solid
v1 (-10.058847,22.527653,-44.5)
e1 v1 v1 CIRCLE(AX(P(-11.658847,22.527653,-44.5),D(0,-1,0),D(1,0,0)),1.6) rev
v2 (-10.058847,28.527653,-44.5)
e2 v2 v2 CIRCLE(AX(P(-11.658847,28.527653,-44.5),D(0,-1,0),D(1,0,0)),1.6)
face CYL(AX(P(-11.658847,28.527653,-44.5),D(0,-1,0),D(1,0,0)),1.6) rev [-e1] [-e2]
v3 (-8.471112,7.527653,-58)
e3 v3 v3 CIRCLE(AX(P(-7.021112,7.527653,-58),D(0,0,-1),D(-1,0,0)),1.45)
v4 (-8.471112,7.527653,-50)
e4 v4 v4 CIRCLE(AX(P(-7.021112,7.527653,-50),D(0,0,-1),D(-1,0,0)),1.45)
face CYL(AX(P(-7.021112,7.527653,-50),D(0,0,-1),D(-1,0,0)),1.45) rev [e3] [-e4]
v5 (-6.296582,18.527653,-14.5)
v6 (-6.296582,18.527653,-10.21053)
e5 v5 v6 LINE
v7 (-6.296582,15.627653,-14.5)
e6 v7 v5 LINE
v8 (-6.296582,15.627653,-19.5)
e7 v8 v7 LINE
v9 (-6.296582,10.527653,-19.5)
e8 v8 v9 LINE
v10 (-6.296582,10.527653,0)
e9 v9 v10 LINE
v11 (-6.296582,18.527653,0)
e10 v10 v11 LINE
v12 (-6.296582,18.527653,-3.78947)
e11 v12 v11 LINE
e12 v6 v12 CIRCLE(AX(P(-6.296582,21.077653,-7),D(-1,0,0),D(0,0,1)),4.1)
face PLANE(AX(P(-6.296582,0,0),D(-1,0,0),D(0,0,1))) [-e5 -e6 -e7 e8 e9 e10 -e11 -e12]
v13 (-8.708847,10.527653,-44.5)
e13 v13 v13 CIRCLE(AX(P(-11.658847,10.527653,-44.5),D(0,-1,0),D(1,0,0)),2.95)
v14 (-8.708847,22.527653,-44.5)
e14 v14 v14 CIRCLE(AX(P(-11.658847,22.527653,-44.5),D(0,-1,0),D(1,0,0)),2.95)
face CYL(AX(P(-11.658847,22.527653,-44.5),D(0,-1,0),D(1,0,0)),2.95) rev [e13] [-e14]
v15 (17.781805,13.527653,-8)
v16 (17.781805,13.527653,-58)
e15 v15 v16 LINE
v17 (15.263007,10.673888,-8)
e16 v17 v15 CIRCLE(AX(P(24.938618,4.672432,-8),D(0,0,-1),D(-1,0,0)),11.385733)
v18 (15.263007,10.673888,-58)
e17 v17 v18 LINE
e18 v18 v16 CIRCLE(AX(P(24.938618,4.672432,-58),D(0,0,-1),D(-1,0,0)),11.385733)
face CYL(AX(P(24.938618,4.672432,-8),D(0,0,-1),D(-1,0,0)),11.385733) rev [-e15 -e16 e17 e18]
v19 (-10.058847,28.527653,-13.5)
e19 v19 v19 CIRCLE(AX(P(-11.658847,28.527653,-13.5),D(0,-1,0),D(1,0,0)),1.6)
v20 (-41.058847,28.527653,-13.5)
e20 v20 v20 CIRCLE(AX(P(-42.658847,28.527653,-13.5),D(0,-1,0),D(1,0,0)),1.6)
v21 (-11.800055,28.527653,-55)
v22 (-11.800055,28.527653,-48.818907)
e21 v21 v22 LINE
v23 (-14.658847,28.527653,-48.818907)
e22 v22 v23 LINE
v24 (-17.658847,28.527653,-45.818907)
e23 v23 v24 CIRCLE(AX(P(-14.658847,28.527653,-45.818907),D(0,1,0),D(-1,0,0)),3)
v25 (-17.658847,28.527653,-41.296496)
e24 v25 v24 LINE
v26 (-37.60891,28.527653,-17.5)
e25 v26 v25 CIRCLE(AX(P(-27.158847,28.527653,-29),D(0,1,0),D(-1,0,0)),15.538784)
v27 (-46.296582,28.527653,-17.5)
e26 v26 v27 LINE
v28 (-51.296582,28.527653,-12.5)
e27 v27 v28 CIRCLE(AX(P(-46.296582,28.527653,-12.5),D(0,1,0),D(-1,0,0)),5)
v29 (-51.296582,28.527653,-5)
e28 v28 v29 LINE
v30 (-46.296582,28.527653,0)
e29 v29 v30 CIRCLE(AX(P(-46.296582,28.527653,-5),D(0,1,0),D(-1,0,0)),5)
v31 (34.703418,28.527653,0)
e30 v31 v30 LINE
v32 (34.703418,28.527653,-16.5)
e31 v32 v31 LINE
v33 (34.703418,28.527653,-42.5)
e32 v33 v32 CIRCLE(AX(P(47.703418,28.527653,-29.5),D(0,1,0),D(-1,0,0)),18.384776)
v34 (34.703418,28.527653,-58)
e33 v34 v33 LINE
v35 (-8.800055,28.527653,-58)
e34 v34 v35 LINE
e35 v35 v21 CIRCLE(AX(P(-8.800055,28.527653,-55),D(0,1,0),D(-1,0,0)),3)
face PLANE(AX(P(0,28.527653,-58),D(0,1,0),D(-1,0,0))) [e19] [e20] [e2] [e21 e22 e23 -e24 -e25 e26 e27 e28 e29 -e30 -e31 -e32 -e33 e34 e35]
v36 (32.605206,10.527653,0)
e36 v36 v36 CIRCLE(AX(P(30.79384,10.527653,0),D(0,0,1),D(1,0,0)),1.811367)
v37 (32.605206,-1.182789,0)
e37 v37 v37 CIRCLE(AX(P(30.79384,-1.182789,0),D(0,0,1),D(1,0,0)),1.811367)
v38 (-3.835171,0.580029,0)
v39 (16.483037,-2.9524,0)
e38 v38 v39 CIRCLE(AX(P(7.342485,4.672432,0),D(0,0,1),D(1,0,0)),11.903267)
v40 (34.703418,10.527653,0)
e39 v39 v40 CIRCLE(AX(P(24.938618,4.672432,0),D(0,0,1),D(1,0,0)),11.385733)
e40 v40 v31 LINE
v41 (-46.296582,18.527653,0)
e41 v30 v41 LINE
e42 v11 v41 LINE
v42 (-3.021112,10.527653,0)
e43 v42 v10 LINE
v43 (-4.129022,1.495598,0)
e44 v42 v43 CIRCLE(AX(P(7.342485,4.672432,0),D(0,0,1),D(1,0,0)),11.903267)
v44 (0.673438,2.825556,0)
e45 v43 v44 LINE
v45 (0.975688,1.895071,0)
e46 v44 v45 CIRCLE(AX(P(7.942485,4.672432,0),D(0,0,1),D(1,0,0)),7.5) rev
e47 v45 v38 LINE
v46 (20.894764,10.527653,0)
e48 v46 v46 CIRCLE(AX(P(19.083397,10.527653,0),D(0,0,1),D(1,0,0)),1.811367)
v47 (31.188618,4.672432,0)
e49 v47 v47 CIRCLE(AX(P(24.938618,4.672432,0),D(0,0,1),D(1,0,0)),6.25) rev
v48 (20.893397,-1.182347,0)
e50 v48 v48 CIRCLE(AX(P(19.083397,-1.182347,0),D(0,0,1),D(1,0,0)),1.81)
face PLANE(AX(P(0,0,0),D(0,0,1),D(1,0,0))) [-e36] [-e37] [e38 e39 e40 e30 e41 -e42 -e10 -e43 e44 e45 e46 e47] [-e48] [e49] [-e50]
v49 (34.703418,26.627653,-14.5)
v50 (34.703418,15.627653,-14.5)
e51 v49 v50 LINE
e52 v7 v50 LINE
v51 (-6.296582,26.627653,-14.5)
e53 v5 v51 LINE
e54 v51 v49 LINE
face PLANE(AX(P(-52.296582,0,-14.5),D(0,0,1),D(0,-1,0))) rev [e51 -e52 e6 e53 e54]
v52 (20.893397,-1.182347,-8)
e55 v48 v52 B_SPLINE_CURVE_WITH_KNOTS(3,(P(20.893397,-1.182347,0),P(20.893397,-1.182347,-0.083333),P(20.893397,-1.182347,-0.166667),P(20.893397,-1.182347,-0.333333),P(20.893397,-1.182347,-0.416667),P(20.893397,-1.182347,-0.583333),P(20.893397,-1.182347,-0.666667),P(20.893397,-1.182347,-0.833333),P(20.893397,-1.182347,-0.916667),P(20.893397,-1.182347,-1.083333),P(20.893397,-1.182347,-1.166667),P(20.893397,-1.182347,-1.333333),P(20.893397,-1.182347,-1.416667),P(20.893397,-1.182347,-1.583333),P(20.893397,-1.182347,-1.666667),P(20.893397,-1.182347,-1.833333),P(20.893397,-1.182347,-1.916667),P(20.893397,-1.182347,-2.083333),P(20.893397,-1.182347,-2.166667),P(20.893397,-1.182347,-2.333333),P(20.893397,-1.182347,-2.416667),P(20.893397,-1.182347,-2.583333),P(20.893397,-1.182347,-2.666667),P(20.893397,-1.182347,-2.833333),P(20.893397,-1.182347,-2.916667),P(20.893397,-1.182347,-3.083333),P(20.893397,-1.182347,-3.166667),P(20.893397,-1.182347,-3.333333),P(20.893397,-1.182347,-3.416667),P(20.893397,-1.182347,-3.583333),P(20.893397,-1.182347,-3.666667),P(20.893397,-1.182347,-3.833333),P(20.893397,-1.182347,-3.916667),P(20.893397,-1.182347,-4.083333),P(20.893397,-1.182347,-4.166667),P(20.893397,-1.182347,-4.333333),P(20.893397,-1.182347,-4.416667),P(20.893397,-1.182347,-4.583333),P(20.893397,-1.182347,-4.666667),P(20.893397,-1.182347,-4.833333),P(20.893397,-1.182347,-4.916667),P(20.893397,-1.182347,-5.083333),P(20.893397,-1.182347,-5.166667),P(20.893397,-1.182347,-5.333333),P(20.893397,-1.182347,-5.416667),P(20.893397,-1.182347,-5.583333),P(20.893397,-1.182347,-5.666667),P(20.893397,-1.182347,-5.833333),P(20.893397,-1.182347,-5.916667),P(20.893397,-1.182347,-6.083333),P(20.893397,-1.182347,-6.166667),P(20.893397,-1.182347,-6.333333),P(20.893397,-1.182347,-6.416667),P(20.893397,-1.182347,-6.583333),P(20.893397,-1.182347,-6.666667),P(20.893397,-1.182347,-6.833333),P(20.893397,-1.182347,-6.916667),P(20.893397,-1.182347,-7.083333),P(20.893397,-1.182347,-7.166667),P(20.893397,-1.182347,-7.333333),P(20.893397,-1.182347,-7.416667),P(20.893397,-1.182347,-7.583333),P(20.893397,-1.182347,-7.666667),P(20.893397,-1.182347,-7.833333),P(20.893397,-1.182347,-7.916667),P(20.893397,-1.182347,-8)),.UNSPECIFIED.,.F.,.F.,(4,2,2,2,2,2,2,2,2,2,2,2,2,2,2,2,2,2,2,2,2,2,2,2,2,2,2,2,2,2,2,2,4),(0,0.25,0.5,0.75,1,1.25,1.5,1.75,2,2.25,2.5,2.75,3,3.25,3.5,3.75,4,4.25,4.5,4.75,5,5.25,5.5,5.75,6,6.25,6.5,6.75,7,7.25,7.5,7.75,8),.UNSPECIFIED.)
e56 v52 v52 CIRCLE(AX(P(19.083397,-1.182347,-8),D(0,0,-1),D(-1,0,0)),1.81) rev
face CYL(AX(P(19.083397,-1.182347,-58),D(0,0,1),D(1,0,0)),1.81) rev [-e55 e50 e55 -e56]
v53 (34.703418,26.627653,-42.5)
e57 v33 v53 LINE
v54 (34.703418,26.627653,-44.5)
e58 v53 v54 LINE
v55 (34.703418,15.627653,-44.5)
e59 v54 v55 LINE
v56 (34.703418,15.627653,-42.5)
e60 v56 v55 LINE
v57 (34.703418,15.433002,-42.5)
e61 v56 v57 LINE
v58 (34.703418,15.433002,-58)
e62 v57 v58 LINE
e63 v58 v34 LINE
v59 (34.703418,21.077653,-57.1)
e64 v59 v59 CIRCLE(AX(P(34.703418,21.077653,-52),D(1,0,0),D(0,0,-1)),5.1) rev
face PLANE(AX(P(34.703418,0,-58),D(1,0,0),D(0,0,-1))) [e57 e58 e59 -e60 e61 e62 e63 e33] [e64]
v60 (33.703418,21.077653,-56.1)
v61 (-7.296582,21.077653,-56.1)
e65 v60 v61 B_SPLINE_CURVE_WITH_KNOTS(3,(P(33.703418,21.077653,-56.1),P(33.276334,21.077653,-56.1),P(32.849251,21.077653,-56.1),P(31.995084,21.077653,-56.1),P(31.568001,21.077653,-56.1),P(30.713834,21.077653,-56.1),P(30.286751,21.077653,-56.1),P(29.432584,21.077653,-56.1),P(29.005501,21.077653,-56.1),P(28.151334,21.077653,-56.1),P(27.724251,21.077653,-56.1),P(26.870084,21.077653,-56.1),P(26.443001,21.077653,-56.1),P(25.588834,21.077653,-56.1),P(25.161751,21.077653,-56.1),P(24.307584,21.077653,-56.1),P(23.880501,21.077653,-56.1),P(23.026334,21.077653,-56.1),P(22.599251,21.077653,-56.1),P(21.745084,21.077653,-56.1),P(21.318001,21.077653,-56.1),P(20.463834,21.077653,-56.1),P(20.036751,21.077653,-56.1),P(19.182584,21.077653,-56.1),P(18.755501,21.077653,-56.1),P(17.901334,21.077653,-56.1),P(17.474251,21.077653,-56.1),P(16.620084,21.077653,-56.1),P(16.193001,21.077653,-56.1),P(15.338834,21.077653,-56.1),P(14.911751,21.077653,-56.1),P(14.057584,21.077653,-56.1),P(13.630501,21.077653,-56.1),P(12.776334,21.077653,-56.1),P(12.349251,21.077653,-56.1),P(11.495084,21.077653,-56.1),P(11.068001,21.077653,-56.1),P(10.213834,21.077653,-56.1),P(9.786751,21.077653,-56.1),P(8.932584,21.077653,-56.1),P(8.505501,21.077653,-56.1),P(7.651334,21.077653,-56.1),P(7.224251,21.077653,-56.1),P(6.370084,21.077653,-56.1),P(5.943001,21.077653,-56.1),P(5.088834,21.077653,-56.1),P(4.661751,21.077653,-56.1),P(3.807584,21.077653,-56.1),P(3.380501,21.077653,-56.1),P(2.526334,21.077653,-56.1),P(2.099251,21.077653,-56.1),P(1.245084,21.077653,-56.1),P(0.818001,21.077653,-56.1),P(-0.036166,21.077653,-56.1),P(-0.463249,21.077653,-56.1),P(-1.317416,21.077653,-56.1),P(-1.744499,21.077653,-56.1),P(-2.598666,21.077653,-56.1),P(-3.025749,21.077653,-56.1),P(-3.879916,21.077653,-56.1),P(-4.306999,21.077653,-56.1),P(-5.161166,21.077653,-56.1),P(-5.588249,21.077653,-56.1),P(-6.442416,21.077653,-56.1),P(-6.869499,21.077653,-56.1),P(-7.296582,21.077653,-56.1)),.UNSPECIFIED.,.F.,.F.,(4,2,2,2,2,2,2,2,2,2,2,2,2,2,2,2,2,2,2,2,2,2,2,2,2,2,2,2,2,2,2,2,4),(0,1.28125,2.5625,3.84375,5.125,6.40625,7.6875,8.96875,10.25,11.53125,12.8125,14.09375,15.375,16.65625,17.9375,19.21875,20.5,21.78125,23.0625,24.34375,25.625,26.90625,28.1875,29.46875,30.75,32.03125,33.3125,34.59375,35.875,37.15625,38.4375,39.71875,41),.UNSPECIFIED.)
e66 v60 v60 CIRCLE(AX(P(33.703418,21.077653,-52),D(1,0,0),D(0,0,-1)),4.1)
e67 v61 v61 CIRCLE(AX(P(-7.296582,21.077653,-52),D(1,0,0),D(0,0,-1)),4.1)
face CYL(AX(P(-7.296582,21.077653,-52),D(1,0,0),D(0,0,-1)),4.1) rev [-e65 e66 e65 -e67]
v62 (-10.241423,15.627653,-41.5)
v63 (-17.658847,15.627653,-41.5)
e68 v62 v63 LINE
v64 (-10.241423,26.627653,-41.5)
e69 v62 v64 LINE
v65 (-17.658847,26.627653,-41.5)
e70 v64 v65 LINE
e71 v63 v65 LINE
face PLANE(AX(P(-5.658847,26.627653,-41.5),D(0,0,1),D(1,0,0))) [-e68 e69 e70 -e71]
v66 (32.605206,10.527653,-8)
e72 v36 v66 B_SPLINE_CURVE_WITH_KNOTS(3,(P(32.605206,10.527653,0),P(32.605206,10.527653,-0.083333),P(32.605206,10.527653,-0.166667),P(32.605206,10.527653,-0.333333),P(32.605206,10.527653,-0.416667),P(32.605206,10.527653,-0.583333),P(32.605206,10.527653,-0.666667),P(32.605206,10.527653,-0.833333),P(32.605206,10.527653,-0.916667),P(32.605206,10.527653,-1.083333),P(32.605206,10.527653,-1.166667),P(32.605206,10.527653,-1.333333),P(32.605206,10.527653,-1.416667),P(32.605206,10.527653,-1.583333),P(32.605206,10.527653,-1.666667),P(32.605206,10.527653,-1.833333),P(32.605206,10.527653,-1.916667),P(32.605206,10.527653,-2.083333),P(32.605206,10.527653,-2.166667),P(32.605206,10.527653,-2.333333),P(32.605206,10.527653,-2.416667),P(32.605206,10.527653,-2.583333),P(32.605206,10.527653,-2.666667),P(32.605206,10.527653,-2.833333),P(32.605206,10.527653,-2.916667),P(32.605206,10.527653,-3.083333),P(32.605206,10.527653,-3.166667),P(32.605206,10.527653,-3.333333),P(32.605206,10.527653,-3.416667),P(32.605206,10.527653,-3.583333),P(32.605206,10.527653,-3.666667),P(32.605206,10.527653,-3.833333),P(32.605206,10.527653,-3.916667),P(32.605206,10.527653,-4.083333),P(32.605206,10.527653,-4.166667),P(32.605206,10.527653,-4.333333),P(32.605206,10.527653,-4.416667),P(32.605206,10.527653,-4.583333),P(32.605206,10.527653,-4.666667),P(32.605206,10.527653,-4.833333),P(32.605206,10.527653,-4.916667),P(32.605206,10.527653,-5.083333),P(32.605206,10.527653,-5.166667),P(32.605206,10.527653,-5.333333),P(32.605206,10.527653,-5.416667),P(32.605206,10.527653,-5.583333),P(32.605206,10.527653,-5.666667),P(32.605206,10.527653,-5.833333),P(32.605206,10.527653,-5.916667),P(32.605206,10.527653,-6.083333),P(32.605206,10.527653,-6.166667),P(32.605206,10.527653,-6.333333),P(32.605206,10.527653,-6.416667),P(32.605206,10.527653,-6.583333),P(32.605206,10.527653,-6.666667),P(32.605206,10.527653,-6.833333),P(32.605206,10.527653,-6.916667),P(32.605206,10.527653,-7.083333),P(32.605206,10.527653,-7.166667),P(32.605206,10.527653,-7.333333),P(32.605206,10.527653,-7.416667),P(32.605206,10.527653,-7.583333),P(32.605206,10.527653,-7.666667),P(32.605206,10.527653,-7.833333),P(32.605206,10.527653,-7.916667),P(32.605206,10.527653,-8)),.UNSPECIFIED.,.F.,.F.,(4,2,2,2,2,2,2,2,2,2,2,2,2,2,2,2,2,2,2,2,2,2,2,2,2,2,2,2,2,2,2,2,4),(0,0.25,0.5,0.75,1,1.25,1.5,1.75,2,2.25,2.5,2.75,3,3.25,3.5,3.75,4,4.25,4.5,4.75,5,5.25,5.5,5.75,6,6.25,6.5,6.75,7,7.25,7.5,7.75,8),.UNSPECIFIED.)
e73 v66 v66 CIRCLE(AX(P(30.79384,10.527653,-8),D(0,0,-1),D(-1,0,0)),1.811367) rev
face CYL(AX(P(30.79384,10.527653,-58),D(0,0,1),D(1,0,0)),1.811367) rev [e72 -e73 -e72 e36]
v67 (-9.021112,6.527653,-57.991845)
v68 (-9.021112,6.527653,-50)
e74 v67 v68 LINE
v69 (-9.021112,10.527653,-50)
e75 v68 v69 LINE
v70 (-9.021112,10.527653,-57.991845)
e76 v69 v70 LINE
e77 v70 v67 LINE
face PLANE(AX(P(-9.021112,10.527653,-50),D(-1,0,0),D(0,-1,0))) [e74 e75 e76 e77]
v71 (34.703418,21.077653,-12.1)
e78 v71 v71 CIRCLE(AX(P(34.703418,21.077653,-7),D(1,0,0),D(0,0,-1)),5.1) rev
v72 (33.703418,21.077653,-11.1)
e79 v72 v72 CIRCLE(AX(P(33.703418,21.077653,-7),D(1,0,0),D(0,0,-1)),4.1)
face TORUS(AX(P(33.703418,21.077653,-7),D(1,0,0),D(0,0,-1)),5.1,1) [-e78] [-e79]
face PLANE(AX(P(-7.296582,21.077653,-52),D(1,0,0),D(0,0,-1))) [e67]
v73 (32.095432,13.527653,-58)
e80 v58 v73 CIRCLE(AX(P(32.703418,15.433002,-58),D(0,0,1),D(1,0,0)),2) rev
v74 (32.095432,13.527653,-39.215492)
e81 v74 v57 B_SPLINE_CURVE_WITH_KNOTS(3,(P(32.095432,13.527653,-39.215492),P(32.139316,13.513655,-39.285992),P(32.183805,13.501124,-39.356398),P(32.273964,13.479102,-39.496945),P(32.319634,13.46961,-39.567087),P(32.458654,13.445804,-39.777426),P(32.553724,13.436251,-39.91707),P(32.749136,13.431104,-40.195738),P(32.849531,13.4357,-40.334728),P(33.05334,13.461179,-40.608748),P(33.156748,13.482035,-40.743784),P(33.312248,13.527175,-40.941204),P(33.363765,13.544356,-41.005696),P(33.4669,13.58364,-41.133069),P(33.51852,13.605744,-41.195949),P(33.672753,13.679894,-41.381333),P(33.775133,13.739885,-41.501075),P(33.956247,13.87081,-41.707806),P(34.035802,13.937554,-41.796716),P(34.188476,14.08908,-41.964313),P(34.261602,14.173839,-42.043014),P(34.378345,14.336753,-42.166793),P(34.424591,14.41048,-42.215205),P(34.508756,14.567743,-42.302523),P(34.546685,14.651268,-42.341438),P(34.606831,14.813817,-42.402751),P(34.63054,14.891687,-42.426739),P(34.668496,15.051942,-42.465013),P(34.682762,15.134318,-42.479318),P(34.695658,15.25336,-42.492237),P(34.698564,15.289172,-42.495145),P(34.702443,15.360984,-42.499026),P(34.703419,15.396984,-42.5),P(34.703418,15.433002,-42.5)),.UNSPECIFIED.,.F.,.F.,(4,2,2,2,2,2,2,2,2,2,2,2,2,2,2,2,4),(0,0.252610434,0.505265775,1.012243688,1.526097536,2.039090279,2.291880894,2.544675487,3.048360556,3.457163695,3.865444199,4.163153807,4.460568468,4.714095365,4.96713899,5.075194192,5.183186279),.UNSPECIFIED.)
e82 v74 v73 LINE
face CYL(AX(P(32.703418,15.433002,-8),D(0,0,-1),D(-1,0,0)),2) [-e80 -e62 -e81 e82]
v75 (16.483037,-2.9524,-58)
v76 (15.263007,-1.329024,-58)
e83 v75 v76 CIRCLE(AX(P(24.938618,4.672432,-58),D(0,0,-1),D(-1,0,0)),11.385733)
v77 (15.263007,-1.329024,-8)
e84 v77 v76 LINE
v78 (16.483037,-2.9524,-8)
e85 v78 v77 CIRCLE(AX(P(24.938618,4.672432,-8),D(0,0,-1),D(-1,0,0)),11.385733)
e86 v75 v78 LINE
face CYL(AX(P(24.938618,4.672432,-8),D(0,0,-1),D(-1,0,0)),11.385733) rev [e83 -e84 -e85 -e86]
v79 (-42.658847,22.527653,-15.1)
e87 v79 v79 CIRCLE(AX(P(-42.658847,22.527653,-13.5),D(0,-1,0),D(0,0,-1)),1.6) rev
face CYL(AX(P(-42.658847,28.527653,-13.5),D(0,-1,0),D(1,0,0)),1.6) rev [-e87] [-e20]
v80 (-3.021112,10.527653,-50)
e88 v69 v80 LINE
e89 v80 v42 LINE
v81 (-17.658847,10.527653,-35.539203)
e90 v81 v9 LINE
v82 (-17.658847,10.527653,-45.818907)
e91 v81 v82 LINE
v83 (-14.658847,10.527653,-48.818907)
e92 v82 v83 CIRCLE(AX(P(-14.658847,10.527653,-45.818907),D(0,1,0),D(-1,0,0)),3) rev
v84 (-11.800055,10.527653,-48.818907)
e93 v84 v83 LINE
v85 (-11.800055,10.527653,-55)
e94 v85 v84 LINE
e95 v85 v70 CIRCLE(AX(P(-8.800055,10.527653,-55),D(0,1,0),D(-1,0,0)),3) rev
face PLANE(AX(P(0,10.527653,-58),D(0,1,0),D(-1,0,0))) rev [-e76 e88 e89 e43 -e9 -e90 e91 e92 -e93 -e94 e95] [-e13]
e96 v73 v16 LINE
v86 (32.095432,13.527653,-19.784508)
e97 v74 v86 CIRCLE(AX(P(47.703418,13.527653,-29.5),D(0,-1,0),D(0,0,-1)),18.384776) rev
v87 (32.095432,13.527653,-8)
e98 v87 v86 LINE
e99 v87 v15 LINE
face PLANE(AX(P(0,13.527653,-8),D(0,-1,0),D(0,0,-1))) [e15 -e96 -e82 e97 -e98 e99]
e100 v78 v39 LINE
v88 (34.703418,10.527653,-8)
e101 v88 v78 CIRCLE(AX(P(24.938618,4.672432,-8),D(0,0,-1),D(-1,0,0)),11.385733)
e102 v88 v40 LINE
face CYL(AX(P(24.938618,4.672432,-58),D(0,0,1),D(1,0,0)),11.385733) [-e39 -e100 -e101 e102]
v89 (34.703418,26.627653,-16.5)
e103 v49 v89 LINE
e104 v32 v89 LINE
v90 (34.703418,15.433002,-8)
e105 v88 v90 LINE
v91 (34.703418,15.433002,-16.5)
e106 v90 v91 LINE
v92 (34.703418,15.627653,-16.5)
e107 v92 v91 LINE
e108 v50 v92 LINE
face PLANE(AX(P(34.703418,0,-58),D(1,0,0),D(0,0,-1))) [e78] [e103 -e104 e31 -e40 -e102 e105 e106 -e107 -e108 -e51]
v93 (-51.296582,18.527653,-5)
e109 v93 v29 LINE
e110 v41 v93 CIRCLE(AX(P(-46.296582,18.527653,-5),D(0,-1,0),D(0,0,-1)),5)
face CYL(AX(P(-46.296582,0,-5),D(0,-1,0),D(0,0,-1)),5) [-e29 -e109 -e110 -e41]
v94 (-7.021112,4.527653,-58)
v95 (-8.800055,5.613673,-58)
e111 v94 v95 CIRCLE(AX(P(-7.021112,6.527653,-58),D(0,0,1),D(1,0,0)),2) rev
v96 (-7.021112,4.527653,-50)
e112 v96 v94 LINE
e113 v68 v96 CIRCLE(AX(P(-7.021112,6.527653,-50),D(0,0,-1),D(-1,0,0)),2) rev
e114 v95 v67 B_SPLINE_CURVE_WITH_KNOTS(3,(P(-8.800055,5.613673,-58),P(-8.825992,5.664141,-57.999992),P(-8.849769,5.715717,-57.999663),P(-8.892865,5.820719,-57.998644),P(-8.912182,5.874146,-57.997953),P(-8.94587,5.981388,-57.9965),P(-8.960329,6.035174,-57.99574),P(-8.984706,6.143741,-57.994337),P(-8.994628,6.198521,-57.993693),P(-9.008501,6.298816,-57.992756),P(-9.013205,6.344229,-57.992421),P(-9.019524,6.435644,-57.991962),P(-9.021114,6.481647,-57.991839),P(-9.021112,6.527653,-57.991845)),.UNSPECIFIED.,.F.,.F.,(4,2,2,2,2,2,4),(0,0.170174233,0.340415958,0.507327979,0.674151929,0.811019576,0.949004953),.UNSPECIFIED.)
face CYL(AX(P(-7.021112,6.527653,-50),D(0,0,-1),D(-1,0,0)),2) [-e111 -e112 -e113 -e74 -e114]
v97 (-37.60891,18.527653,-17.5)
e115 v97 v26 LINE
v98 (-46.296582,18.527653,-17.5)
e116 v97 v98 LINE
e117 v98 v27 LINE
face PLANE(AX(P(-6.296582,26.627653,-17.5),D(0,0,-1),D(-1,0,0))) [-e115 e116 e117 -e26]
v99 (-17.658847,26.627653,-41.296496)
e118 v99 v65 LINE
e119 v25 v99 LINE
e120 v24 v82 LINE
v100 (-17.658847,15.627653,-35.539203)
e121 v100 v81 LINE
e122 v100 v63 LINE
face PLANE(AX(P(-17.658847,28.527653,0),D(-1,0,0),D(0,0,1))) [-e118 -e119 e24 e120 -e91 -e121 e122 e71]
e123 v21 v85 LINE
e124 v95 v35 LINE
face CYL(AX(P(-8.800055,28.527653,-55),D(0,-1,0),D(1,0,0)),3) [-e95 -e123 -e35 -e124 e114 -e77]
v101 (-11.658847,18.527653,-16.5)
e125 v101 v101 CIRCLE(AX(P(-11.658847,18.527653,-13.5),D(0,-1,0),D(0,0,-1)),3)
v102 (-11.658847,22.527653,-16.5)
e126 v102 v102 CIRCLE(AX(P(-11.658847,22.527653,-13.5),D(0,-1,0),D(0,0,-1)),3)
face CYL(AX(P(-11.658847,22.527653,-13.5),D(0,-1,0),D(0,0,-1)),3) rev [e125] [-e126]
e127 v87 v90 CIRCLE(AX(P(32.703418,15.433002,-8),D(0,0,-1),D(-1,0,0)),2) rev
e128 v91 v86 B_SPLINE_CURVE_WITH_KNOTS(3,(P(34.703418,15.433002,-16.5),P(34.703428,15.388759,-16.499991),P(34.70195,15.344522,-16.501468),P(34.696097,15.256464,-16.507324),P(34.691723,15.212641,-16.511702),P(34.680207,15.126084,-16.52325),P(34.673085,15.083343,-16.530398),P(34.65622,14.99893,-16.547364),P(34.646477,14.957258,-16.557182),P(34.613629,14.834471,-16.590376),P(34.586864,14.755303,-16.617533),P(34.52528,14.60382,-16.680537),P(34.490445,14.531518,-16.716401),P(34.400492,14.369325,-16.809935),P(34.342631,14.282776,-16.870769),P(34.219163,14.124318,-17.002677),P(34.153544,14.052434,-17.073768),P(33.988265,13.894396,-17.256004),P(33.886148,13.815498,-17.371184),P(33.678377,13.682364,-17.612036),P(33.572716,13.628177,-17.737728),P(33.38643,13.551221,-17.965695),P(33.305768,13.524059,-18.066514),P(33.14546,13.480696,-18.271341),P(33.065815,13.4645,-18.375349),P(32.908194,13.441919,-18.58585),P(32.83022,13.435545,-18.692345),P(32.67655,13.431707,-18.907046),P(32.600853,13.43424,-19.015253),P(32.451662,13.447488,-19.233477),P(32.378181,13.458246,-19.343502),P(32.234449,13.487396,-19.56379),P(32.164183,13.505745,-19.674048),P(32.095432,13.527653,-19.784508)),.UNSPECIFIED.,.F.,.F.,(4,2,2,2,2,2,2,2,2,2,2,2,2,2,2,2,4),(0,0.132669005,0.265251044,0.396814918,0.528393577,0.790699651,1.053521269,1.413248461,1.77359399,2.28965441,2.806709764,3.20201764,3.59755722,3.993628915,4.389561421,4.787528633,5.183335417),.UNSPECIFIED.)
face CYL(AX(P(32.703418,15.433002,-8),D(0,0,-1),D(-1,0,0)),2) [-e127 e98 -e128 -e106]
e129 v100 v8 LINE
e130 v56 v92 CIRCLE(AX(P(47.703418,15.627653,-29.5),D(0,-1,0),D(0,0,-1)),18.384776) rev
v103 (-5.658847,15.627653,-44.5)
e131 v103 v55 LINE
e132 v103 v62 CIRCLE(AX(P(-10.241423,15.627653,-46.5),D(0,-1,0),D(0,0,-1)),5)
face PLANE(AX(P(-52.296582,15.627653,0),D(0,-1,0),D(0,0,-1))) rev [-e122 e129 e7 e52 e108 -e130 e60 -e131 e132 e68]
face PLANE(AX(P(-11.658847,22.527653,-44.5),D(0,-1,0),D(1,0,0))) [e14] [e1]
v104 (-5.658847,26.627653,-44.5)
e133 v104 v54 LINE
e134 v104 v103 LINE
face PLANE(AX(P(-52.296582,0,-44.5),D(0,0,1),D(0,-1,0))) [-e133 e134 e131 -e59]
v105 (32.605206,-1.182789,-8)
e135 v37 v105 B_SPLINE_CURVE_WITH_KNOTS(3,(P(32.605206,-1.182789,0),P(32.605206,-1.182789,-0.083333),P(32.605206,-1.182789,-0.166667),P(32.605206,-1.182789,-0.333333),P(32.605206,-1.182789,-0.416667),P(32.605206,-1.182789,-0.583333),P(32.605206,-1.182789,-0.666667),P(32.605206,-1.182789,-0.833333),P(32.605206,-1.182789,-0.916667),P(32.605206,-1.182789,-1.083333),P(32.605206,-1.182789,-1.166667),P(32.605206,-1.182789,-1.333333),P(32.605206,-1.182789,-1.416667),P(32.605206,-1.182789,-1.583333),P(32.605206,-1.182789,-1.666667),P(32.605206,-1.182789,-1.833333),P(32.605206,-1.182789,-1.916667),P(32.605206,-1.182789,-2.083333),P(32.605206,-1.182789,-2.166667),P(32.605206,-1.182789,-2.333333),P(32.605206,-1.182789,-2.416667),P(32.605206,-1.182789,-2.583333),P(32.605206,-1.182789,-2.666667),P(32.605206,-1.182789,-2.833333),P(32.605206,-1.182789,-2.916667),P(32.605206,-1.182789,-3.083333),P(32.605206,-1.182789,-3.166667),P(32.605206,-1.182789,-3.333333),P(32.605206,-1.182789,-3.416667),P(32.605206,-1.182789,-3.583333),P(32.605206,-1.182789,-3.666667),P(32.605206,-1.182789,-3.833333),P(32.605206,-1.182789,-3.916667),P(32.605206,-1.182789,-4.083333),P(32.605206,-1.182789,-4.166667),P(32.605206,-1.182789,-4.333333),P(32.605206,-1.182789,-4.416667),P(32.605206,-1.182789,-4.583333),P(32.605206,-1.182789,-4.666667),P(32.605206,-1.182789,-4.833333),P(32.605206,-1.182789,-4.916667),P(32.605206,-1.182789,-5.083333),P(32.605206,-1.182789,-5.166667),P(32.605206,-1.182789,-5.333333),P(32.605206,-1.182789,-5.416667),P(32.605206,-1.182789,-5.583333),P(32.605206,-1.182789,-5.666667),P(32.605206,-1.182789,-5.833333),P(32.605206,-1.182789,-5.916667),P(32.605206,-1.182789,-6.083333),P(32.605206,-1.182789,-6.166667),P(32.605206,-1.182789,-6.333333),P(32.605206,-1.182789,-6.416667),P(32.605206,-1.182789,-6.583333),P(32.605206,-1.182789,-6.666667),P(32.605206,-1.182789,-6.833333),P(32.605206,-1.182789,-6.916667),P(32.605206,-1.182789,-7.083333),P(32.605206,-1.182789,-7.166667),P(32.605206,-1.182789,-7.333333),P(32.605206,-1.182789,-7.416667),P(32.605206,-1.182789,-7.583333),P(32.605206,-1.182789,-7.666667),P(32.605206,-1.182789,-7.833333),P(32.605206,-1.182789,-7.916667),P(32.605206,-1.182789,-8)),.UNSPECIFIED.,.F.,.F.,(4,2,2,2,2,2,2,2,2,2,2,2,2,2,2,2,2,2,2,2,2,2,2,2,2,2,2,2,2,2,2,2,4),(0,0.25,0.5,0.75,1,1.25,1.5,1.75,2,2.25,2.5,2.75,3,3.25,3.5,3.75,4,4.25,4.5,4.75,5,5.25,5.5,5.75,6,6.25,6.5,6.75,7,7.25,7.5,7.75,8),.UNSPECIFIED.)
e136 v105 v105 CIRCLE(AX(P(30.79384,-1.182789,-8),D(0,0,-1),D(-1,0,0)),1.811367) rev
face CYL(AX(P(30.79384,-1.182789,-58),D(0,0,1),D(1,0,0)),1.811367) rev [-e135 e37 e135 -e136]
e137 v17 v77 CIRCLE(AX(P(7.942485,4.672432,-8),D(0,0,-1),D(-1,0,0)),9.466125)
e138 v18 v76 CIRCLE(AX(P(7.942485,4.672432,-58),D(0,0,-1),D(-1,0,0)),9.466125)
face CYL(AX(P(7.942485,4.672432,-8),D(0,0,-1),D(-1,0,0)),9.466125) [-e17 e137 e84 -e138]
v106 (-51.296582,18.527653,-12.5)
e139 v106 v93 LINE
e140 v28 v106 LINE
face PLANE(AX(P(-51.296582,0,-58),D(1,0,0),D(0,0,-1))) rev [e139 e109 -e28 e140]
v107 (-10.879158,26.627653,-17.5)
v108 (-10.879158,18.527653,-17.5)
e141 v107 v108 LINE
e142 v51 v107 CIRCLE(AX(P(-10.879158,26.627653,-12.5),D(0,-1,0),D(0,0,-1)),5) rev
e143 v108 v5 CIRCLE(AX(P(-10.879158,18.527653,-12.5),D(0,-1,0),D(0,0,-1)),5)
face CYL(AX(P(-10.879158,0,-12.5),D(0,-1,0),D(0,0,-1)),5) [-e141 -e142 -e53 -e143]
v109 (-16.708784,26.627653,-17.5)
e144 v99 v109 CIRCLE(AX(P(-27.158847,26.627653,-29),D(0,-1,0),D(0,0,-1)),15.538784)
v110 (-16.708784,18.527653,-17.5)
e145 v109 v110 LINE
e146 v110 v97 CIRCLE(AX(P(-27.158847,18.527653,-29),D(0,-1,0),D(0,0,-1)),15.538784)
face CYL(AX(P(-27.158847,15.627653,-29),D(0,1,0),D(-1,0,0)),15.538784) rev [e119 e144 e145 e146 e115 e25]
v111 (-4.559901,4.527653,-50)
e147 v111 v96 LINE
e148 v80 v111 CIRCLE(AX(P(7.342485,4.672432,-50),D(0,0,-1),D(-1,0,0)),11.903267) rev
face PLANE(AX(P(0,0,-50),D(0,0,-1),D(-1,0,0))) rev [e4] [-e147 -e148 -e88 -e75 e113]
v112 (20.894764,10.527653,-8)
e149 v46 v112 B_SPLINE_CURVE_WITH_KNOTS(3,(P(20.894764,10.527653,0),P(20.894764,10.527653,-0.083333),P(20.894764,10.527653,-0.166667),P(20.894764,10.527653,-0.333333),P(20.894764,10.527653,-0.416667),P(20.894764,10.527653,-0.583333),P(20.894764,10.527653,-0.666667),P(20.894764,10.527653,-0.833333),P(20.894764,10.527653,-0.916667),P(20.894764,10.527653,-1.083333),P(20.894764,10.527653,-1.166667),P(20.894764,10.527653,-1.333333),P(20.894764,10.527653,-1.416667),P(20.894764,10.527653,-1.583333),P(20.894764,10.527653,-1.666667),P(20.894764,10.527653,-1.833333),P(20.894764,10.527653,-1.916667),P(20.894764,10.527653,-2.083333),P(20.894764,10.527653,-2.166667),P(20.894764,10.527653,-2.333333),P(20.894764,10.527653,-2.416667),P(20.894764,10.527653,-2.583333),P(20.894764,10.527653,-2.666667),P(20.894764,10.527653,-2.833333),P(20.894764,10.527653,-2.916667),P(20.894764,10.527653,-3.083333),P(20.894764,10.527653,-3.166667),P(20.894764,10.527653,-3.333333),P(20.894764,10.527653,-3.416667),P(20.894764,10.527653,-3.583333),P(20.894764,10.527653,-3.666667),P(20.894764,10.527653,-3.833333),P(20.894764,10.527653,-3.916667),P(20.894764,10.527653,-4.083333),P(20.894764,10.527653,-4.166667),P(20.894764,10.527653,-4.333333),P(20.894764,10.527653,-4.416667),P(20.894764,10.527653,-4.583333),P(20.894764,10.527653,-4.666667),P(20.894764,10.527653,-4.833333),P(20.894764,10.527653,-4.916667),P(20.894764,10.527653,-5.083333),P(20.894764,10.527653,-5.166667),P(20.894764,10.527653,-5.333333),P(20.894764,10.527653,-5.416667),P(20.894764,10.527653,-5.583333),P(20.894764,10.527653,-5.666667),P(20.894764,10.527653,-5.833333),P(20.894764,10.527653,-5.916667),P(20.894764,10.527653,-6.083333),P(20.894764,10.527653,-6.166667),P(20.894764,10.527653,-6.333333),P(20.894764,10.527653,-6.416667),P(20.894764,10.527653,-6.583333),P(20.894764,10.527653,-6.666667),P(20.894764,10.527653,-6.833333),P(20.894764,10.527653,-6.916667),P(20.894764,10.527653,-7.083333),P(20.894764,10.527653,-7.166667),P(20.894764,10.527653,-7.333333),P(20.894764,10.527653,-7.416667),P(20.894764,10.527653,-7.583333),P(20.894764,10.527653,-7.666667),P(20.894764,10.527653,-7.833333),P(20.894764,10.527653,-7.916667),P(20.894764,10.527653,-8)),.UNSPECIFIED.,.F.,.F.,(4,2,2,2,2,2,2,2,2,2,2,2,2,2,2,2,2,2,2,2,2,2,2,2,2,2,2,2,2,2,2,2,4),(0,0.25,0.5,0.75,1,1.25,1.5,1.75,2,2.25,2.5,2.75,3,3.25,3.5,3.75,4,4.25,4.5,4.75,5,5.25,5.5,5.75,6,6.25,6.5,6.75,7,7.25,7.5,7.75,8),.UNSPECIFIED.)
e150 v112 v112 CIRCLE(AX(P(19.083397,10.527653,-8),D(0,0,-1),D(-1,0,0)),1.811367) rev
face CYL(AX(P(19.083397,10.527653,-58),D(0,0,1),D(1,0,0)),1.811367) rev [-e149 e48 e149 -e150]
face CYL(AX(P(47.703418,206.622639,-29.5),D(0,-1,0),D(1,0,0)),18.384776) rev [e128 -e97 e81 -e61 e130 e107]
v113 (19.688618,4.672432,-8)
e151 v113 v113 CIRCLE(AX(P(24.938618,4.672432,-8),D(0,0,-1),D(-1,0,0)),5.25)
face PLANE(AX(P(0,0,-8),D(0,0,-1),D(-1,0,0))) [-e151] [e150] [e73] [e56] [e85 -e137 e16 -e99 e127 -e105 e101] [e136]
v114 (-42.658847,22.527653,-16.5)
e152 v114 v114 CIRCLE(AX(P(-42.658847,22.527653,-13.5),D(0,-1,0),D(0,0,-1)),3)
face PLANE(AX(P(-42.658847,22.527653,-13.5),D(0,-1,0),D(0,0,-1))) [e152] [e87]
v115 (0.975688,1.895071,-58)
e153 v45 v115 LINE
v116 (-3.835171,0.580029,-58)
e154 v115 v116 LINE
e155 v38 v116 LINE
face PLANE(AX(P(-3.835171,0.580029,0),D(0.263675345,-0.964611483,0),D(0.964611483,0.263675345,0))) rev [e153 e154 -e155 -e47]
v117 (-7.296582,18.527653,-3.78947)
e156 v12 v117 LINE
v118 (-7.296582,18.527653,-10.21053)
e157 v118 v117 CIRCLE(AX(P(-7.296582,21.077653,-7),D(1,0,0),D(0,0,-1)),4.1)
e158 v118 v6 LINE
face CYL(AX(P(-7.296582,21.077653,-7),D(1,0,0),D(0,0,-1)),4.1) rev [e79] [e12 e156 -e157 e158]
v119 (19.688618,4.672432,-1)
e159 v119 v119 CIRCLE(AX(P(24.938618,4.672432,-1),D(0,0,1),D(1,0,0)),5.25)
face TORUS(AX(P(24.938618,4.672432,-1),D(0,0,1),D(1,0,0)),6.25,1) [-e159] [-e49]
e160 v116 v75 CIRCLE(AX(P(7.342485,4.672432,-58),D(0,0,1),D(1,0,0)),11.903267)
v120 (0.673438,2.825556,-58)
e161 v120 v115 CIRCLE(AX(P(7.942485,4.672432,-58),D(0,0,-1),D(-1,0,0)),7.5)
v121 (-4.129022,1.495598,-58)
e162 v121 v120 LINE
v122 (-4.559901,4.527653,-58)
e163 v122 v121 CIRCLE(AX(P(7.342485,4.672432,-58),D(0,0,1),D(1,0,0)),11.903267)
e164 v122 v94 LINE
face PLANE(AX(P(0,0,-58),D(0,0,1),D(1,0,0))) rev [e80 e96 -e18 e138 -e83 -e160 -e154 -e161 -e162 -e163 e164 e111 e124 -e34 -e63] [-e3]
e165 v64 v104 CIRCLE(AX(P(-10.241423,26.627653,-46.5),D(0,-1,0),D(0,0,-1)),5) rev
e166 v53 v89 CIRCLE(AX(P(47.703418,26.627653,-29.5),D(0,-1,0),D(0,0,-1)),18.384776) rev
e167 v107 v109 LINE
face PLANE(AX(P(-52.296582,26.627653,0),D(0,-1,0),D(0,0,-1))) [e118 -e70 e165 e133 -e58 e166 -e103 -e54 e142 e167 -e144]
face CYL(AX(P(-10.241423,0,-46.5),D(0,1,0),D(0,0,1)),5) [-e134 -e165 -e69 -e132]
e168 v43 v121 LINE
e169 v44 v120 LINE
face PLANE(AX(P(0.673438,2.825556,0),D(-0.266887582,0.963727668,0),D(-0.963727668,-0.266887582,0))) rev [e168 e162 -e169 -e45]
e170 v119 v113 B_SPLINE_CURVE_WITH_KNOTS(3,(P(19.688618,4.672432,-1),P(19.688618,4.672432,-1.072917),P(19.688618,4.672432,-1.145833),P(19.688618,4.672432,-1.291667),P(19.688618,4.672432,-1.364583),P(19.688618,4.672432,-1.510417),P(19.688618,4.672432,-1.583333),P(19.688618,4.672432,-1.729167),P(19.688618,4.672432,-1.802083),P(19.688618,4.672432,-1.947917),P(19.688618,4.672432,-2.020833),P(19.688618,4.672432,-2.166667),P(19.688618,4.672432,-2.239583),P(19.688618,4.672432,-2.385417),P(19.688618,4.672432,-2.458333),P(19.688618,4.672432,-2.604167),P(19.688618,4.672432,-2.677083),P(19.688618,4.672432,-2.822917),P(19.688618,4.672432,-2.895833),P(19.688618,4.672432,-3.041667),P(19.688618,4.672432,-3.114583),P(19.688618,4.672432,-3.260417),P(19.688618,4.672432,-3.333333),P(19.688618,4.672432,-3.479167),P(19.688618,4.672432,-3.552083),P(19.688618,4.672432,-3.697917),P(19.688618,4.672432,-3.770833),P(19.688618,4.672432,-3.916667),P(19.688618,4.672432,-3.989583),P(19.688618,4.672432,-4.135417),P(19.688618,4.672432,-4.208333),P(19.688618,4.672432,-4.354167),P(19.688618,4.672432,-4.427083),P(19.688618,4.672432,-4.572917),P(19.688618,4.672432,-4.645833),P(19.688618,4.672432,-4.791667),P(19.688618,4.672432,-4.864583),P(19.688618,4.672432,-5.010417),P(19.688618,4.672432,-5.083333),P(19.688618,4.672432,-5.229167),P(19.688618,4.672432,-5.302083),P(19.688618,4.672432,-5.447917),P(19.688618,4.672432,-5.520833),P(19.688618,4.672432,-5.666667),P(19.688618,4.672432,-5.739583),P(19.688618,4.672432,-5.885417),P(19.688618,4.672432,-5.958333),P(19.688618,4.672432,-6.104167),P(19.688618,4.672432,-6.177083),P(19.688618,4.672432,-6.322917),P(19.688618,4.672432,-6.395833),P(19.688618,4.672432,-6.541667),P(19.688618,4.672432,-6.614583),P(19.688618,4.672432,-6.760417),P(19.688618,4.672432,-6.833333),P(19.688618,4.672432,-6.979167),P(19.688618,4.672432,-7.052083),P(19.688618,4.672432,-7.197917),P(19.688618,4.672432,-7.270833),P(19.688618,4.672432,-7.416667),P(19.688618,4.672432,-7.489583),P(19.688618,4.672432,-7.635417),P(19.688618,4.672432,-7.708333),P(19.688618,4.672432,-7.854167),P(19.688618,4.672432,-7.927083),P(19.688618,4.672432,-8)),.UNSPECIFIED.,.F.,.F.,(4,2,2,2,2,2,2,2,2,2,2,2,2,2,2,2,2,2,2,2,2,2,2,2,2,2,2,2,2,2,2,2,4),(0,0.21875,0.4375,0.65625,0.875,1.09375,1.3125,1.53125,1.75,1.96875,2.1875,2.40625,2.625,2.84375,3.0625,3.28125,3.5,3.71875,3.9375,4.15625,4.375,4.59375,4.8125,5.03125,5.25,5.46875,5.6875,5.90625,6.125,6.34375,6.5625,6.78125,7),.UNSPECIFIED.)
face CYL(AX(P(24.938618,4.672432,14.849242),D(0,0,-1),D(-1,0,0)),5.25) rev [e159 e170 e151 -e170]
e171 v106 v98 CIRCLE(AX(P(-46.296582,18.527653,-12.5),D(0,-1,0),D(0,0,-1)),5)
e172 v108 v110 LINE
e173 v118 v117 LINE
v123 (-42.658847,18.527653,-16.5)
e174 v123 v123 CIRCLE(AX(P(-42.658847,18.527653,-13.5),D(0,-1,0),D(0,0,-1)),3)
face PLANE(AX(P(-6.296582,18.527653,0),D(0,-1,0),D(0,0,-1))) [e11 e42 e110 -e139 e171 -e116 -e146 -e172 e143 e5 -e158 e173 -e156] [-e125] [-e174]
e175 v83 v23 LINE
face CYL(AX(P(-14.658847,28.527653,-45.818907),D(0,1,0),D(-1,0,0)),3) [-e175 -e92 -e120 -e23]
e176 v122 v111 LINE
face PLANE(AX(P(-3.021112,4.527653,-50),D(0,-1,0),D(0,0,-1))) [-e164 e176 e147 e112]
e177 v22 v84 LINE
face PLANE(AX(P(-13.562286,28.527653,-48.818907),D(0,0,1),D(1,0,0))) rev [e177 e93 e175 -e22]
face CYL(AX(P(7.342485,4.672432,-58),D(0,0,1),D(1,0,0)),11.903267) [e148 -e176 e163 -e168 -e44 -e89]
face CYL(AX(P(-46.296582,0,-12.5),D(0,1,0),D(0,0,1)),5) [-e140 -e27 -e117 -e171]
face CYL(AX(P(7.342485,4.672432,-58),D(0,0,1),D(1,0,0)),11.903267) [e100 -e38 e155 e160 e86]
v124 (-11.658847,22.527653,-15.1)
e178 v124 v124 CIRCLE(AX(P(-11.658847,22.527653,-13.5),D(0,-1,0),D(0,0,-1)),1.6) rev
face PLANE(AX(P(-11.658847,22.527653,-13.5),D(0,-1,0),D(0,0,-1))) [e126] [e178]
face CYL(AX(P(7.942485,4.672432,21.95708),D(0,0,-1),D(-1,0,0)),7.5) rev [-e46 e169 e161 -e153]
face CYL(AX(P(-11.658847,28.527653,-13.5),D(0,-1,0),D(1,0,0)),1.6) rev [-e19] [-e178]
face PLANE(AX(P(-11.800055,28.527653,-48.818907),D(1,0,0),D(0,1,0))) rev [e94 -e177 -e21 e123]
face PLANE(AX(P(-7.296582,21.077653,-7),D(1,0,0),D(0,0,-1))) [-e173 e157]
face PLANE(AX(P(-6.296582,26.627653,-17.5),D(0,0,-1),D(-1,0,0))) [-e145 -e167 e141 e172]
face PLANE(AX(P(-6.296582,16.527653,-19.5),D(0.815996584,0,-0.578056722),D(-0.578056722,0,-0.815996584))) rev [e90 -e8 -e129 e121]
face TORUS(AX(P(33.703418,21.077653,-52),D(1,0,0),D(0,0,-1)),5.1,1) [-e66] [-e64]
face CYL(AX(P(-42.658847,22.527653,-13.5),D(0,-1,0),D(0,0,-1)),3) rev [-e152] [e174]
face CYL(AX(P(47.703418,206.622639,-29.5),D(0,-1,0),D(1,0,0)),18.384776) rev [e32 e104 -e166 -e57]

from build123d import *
from build123d.topology import SkipClean

# Parameters (mm, degrees)
CROQUIS2_R                  = 1.81
CROQUIS2_R_2                = 1.811366659
CROQUIS2_R_3                = 5
SALIENTE_EXTRUIR2_DEPTH     = 58
CROQUIS4_W                  = 30
CROQUIS4_H                  = 11
CORTAR_EXTRUIR4_DEPTH       = 87
CROQUIS6_R                  = 1.6
CORTAR_EXTRUIR5_DEPTH       = 18
CROQUIS7_W                  = 3
CROQUIS7_H                  = 11
SALIENTE_EXTRUIR3_DEPTH     = 12
CROQUIS8_W                  = 3
CROQUIS8_H                  = 11
SALIENTE_EXTRUIR4_DEPTH     = 45
CORTAR_EXTRUIR6_DEPTH       = 45
CORTAR_EXTRUIR7_DEPTH       = 6
CORTAR_EXTRUIR8_DEPTH       = 18
CROQUIS12_W                 = 2
CROQUIS12_H                 = 1.9
CORTAR_EXTRUIR9_DEPTH       = 33.637735
CORTAR_EXTRUIR10_START      = -10
CROQUIS13_R                 = 15.538783986
CORTAR_EXTRUIR10_DEPTH      = 10
CORTAR_EXTRUIR11_START      = -18
CROQUIS15_R                 = 1.6
CORTAR_EXTRUIR11_DEPTH      = 18
CROQUIS16_R                 = 3
CORTAR_EXTRUIR12_DEPTH      = 4
CORTAR_EXTRUIR16_START      = -50
CROQUIS3_R                  = 1.811366659
CROQUIS3_R_2                = 1.81
CROQUIS3_R_3                = 5
CORTAR_EXTRUIR16_DEPTH      = 50
CROQUIS18_R                 = 4.1
CORTAR_EXTRUIR17_DEPTH      = 42
CORTAR_EXTRUIR19_DEPTH      = 86.287799889
CORTAR_EXTRUIR19_DEPTH_BACK = 19
REDONDEO1_R                 = 5
REDONDEO2_R                 = 5
REDONDEO3_R                 = 2
REDONDEO4_R                 = 1
SALIENTE_EXTRUIR5_START     = -58
CROQUIS20_R                 = 7.762999965
CROQUIS20_R_2               = 7.5
SALIENTE_EXTRUIR5_DEPTH     = 58
CORTAR_EXTRUIR20_START      = -58
CORTAR_EXTRUIR20_DEPTH      = 58
CORTAR_EXTRUIR21_START      = -8
CROQUIS22_R                 = 5.25
CROQUIS22_R_2               = 5
CORTAR_EXTRUIR21_DEPTH      = 8
REDONDEO6_R                 = 1
CROQUIS17_R                 = 2.95
CORTAR_EXTRUIR22_DEPTH      = 12
CROQUIS23_W                 = 6
CROQUIS23_H                 = 6
SALIENTE_EXTRUIR6_DEPTH     = 8
CROQUIS24_R                 = 1.45
CORTAR_EXTRUIR23_DEPTH      = 8
REDONDEO7_R                 = 3
REDONDEO8_R                 = 2


with BuildPart() as part:
    # Croquis2 → Saliente-Extruir2 (new body)
    # profile 1 of 2: a face of its own
    with BuildSketch(Plane.XY):
        with BuildLine():
            Line((-51.296582303, 10.52765343), (-3.021111794, 10.52765343))
            ThreePointArc((-3.021111794, 10.52765343), (2.658948602, 15.615568942), (10.261175847, 16.212319545))
            ThreePointArc((10.261175847, 16.212319545), (10.994920637, 16.001486452), (11.713641148, 15.74405134))
            ThreePointArc((11.713641148, 15.74405134), (14.314690486, 14.320028149), (16.483037003, 12.297264423))
            ThreePointArc((16.483037003, 12.297264423), (26.039251667, 16.004842725), (34.703417697, 10.52765343))
            Line((34.703417697, 10.52765343), (34.703417697, 28.52765343))
            Line((34.703417697, 28.52765343), (-51.296582303, 28.52765343))
            Line((-51.296582303, 28.52765343), (-51.296582303, 10.52765343))
        make_face()
    # profile 2 of 2: a face of its own
    with BuildSketch(Plane.XY):
        with BuildLine():
            ThreePointArc((10.261175847, 16.212319545), (2.658948602, 15.615568942), (-3.021111794, 10.52765343))
            ThreePointArc((-3.021111794, 10.52765343), (-4.56078153, 4.672432185), (-3.021111794, -1.182789061))
            ThreePointArc((-3.021111794, -1.182789061), (1.08700104, -5.454594795), (6.74587135, -7.215873335))
            ThreePointArc((6.74587135, -7.215873335), (7.342485083, -7.230834429), (7.939098816, -7.215873335))
            ThreePointArc((7.939098816, -7.215873335), (12.657313381, -5.978406103), (16.483037003, -2.952400054))
            ThreePointArc((16.483037003, -2.952400054), (26.039251667, -6.659978355), (34.703417697, -1.182789061))
            ThreePointArc((34.703417697, -1.182789061), (36.324351619, 4.672432185), (34.703417697, 10.52765343))
            ThreePointArc((34.703417697, 10.52765343), (26.039251667, 16.004842725), (16.483037003, 12.297264423))
            ThreePointArc((16.483037003, 12.297264423), (14.314690486, 14.320028149), (11.713641148, 15.74405134))
            ThreePointArc((11.713641148, 15.74405134), (10.994920637, 16.001486452), (10.261175847, 16.212319545))
        make_face()
        with Locations((19.083397092, -1.18234657)):
            Circle(CROQUIS2_R, mode=Mode.SUBTRACT)
        with Locations((30.793839583, -1.182789061)):
            Circle(CROQUIS2_R_2, mode=Mode.SUBTRACT)
        with BuildLine():
            ThreePointArc((15.705485048, 4.672432185), (13.638785674, -0.601686513), (8.539098816, -3.0676079))
            ThreePointArc((8.539098816, -3.0676079), (7.942485083, -3.09056778), (7.34587135, -3.0676079))
            ThreePointArc((7.34587135, -3.0676079), (0.281539843, 5.927058219), (9.84597906, 12.19844568))
            ThreePointArc((9.84597906, 12.19844568), (10.524835531, 11.993336133), (11.182141794, 11.727132239))
            ThreePointArc((11.182141794, 11.727132239), (14.477529972, 8.862582154), (15.705485048, 4.672432185))
        make_face(mode=Mode.SUBTRACT)
        with Locations((24.938618337, 4.672432185)):
            Circle(CROQUIS2_R_3, mode=Mode.SUBTRACT)
        with Locations((19.083397092, 10.52765343)):
            Circle(CROQUIS2_R_2, mode=Mode.SUBTRACT)
        with Locations((30.793839583, 10.52765343)):
            Circle(CROQUIS2_R_2, mode=Mode.SUBTRACT)
    extrude(amount=-SALIENTE_EXTRUIR2_DEPTH)

    # Croquis4 → Cortar-Extruir4 (cut)
    with BuildSketch(Plane(origin=(34.703417697, 0, 0), x_dir=(0, 0, -1), z_dir=(1, 0, 0))):
        with Locations((29.5, 21.12765343)):
            Rectangle(CROQUIS4_W, CROQUIS4_H)
    extrude(amount=-CORTAR_EXTRUIR4_DEPTH, mode=Mode.SUBTRACT)

    # Croquis6 → Cortar-Extruir5 (cut)
    with BuildSketch(Plane.XZ.offset(-10.52765343)):
        Polygon((-51.296582303, -19.5), (-51.296582303, -44.5), (-51.296582303, -58), (-17.658847049, -58), (-17.658847049, -19.5), align=None)
        with Locations((-11.658847049, -13.5)):
            Circle(CROQUIS6_R)
        with Locations((-42.658847049, -13.5)):
            Circle(CROQUIS6_R)
        with Locations((-11.658847049, -44.5)):
            Circle(CROQUIS6_R)
    extrude(amount=-CORTAR_EXTRUIR5_DEPTH, mode=Mode.SUBTRACT)

    # Croquis7 → Saliente-Extruir3 (add)
    with BuildSketch(Plane.ZY.offset(17.658847049)):
        with Locations((-43, 21.12765343)):
            Rectangle(CROQUIS7_W, CROQUIS7_H)
    extrude(amount=-SALIENTE_EXTRUIR3_DEPTH)

    # Croquis8 → Saliente-Extruir4 (add)
    with BuildSketch(Plane.ZY.offset(51.296582303)):
        with Locations((-16, 21.12765343)):
            Rectangle(CROQUIS8_W, CROQUIS8_H)
    extrude(amount=-SALIENTE_EXTRUIR4_DEPTH)

    # Croquis9 → Cortar-Extruir6 (cut)
    with BuildSketch(Plane.ZY.offset(51.296582303)):
        Polygon((0, 18.52765343), (-17.5, 18.52765343), (-17.5, 15.62765343), (-19.5, 15.62765343), (-19.5, 10.52765343), (0, 10.52765343), align=None)
    extrude(amount=-CORTAR_EXTRUIR6_DEPTH, mode=Mode.SUBTRACT)

    # Croquis10 → Cortar-Extruir7 (cut)
    with BuildSketch(Plane.XZ.offset(-10.52765343)):
        Polygon((-6.296582303, -19.5), (-17.658847049, -35.539203183), (-17.658847049, -19.5), align=None)
    extrude(amount=-CORTAR_EXTRUIR7_DEPTH, mode=Mode.SUBTRACT)

    # Croquis11 → Cortar-Extruir8 (cut)
    with BuildSketch(Plane.XZ.offset(-10.52765343)):
        Polygon((-13.562286071, -58), (-11.800055192, -58), (-11.800055192, -48.818907414), (-13.562286071, -48.818907414), (-17.658847049, -48.818907414), (-17.658847049, -58), align=None)
    extrude(amount=-CORTAR_EXTRUIR8_DEPTH, mode=Mode.SUBTRACT)

    # Croquis12 → Cortar-Extruir9 (cut)
    with SkipClean():  # the faces are left unmerged after this step: merging them gives an invalid solid
        with BuildSketch(Plane.ZY.offset(51.296582303)):
            with Locations((-18.5, 27.57765343)):
                Rectangle(CROQUIS12_W, CROQUIS12_H)
        extrude(amount=-CORTAR_EXTRUIR9_DEPTH, mode=Mode.SUBTRACT)

    # Croquis13 → Cortar-Extruir10 (cut)
    with BuildSketch(Plane(origin=(0, 28.52765343, 0), x_dir=(1, 0, 0), z_dir=(0, 1, 0)).offset(CORTAR_EXTRUIR10_START)):
        with Locations((-27.158847049, 29)):
            Circle(CROQUIS13_R)
    extrude(amount=CORTAR_EXTRUIR10_DEPTH, mode=Mode.SUBTRACT)

    # Croquis15 → Cortar-Extruir11 (cut)
    with SkipClean():  # the faces are left unmerged after this step: merging them gives an invalid solid
        with BuildSketch(Plane(origin=(0, 28.52765343, 0), x_dir=(1, 0, 0), z_dir=(0, 1, 0)).offset(CORTAR_EXTRUIR11_START)):
            with Locations((-11.658847049, 44.5)):
                Circle(CROQUIS15_R)
            with Locations((-11.658847049, 13.5)):
                Circle(CROQUIS15_R)
            with Locations((-42.658847049, 13.5)):
                Circle(CROQUIS15_R)
        extrude(amount=CORTAR_EXTRUIR11_DEPTH, mode=Mode.SUBTRACT)

    # Croquis16 → Cortar-Extruir12 (cut)
    with SkipClean():  # the faces are left unmerged after this step: merging them gives an invalid solid
        with BuildSketch(Plane.XZ.offset(-18.52765343)):
            with Locations(Location((-11.658847049, -13.5, 0), (0, 0, 270))):
                Circle(CROQUIS16_R)
            with Locations(Location((-42.658847049, -13.5, 0), (0, 0, 270))):
                Circle(CROQUIS16_R)
        extrude(amount=-CORTAR_EXTRUIR12_DEPTH, mode=Mode.SUBTRACT)

    # Croquis3 → Cortar-Extruir16 (cut)
    with SkipClean():  # the faces are left unmerged after this step: merging them gives an invalid solid
        with BuildSketch(Plane(origin=(0, 0, -58), x_dir=(-1, 0, 0), z_dir=(0, 0, -1)).offset(CORTAR_EXTRUIR16_START)):
            with BuildLine():
                Line((-17.781804866, 13.52765343), (-32.095431809, 13.52765343))
                ThreePointArc((-32.095431809, 13.52765343), (-33.53136209, 12.142350335), (-34.703417697, 10.52765343))
                ThreePointArc((-34.703417697, 10.52765343), (-31.710359136, -4.480624623), (-16.483037003, -2.952400054))
                ThreePointArc((-16.483037003, -2.952400054), (-15.856775383, -2.194521355), (-15.298229788, -1.385441287))
                ThreePointArc((-15.298229788, -1.385441287), (-15.280577399, -1.357258323), (-15.263007401, -1.329023921))
                ThreePointArc((-15.263007401, -1.329023921), (-17.408610077, 4.672432185), (-15.263007401, 10.67388829))
                ThreePointArc((-15.263007401, 10.67388829), (-15.280577399, 10.702122692), (-15.298229788, 10.730305656))
                ThreePointArc((-15.298229788, 10.730305656), (-16.424348693, 12.231673866), (-17.781804866, 13.52765343))
            make_face()
            with Locations(Location((-30.793839583, -1.182789061, 0), (0, 0, 180))):
                Circle(CROQUIS3_R, mode=Mode.SUBTRACT)
            with Locations(Location((-19.083397092, -1.18234657, 0), (0, 0, 180))):
                Circle(CROQUIS3_R_2, mode=Mode.SUBTRACT)
            with Locations(Location((-30.793839583, 10.52765343, 0), (0, 0, 180))):
                Circle(CROQUIS3_R, mode=Mode.SUBTRACT)
            with Locations(Location((-24.938618337, 4.672432185, 0), (0, 0, 180))):
                Circle(CROQUIS3_R_3, mode=Mode.SUBTRACT)
            with Locations(Location((-19.083397092, 10.52765343, 0), (0, 0, 180))):
                Circle(CROQUIS3_R, mode=Mode.SUBTRACT)
        extrude(amount=CORTAR_EXTRUIR16_DEPTH, mode=Mode.SUBTRACT)

    # Croquis18 → Cortar-Extruir17 (cut)
    with SkipClean():  # the faces are left unmerged after this step: merging them gives an invalid solid
        with BuildSketch(Plane(origin=(34.703417697, 0, 0), x_dir=(0, 0, -1), z_dir=(1, 0, 0))):
            with Locations((7, 21.07765343)):
                Circle(CROQUIS18_R)
            with Locations((52, 21.07765343)):
                Circle(CROQUIS18_R)
        extrude(amount=-CORTAR_EXTRUIR17_DEPTH, mode=Mode.SUBTRACT)

    # Croquis19 → Cortar-Extruir19 (cut, two sides: drawn at the far end of the back side and taken through both)
    with SkipClean():  # the faces are left unmerged after this step: merging them gives an invalid solid
        with BuildSketch(Plane(origin=(0, 28.52765343, 0), x_dir=(1, 0, 0), z_dir=(0, 1, 0)).offset(-CORTAR_EXTRUIR19_DEPTH_BACK)):
            with BuildLine():
                Line((177.437671377, 185.23425368), (34.703417697, 42.5))
                ThreePointArc((34.703417697, 42.5), (29.318641386, 29.5), (34.703417697, 16.5))
                Line((34.703417697, 16.5), (177.437671377, -126.23425368))
                Line((177.437671377, -126.23425368), (581.151106118, -126.23425368))
                Line((581.151106118, -126.23425368), (581.151106118, 185.23425368))
                Line((581.151106118, 185.23425368), (177.437671377, 185.23425368))
            make_face()
        extrude(amount=CORTAR_EXTRUIR19_DEPTH + CORTAR_EXTRUIR19_DEPTH_BACK, mode=Mode.SUBTRACT)

    # Redondeo1
    # the kernel refuses this fillet: 5 mm, written as the material it takes off along each edge
    with BuildSketch(Plane(origin=(-51.296582303, 41.02765343, -17.5), x_dir=(0, 0, 1), z_dir=(0, -1, 0))) as redondeo1_piece_1:
        with BuildLine():
            CenterArc((REDONDEO1_R, -REDONDEO1_R), REDONDEO1_R, 90, 90)
            Line((0, -REDONDEO1_R), (0, 0))
            Line((0, 0), (REDONDEO1_R, 0))
        make_face()
    extrude(amount=35, mode=Mode.SUBTRACT)
    with BuildSketch(Plane(origin=(-5.658847049, 26.62765343, -41.5), x_dir=(-1, 0, 0), z_dir=(0, -1, 0))) as redondeo1_piece_2:
        with BuildLine():
            CenterArc((4.582575695, 5), REDONDEO1_R, 203.578178478, 66.421821522)
            Line((0, 3), (0, 0))
            Line((0, 0), (4.582575695, 0))
        make_face()
    extrude(amount=11, mode=Mode.SUBTRACT)
    with BuildSketch(Plane(origin=(-6.296582303, 26.62765343, -17.5), x_dir=(-1, 0, 0), z_dir=(0, -1, 0))) as redondeo1_piece_3:
        with BuildLine():
            CenterArc((4.582575695, -5), REDONDEO1_R, 90, 66.421821522)
            Line((0, -3), (0, 0))
            Line((0, 0), (4.582575695, 0))
        make_face()
    extrude(amount=19.556439237, mode=Mode.SUBTRACT)

    # Redondeo2
    redondeo2_edges = [part.edges().sort_by_distance(p)[0] for p in [
        (-51.296582303, 23.52765343, 0),
    ]]
    fillet(redondeo2_edges, radius=REDONDEO2_R)

    # Redondeo3
    # the kernel refuses this fillet: 2 mm, written as the material it takes off along each edge
    with BuildSketch(Plane(origin=(34.703417697, 10.52765343, -8), x_dir=(0, 1, 0), z_dir=(0, 0, -1))) as redondeo3_piece_1:
        with BuildLine():
            CenterArc((4.905348566, -2), REDONDEO3_R, 90, 107.697587282)
            ThreePointArc((3, -2.607985888), (1.614696905, -1.172055607), (0, 0))
            Line((0, 0), (4.905348566, 0))
        make_face()
    extrude(amount=20.763371416, mode=Mode.SUBTRACT)
    with BuildSketch(Plane(origin=(34.703417697, 10.52765343, -30.236628584), x_dir=(0, 1, 0), z_dir=(0, 0, -1))) as redondeo3_piece_2:
        with BuildLine():
            CenterArc((4.905348566, -2), REDONDEO3_R, 90, 107.697587282)
            ThreePointArc((3, -2.607985888), (1.614696905, -1.172055607), (0, 0))
            Line((0, 0), (4.905348566, 0))
        make_face()
    extrude(amount=40.026742832, mode=Mode.SUBTRACT)

    # Redondeo4
    redondeo4_edges = [part.edges().sort_by_distance(p)[0] for p in [
        (34.703417697, 21.07765343, -2.9),
        (34.703417697, 21.07765343, -47.9),
    ]]
    fillet(redondeo4_edges, radius=REDONDEO4_R)

    # Croquis20 → Saliente-Extruir5 (add)
    with BuildSketch(Plane(origin=(0, 0, -58), x_dir=(-1, 0, 0), z_dir=(0, 0, -1)).offset(SALIENTE_EXTRUIR5_START)):
        with Locations((-7.942485083, 4.672432185)):
            Circle(CROQUIS20_R)
        with Locations((-7.942485083, 4.672432185)):
            Circle(CROQUIS20_R_2, mode=Mode.SUBTRACT)
    extrude(amount=SALIENTE_EXTRUIR5_DEPTH)

    # Croquis21 → Cortar-Extruir20 (cut)
    with BuildSketch(Plane(origin=(0, 0, -58), x_dir=(-1, 0, 0), z_dir=(0, 0, -1)).offset(CORTAR_EXTRUIR20_START)):
        with BuildLine():
            Line((-0.673437857, 2.825555786), (4.129022296, 1.495598146))
            ThreePointArc((4.129022296, 1.495598146), (3.991345512, 1.034845056), (3.835170804, 0.580028865))
            Line((3.835170804, 0.580028865), (-0.975687749, 1.895071044))
            ThreePointArc((-0.975687749, 1.895071044), (-0.809374398, 2.355379757), (-0.673437857, 2.825555786))
        make_face()
    extrude(amount=CORTAR_EXTRUIR20_DEPTH, mode=Mode.SUBTRACT)

    # Croquis22 → Cortar-Extruir21 (cut)
    with BuildSketch(Plane(origin=(0, 0, -8), x_dir=(-1, 0, 0), z_dir=(0, 0, -1)).offset(CORTAR_EXTRUIR21_START)):
        with Locations((-24.938618337, 4.672432185)):
            Circle(CROQUIS22_R)
        with Locations((-24.938618337, 4.672432185)):
            Circle(CROQUIS22_R_2, mode=Mode.SUBTRACT)
    extrude(amount=CORTAR_EXTRUIR21_DEPTH, mode=Mode.SUBTRACT)

    # Redondeo6
    redondeo6_edges = [part.edges().sort_by_distance(p)[0] for p in [
        (30.188618337, 4.672432185, 0),
    ]]
    fillet(redondeo6_edges, radius=REDONDEO6_R)

    # Croquis17 → Cortar-Extruir22 (cut)
    with BuildSketch(Plane.XZ.offset(-10.52765343)):
        with Locations((-11.658847049, -44.5)):
            Circle(CROQUIS17_R)
    extrude(amount=-CORTAR_EXTRUIR22_DEPTH, mode=Mode.SUBTRACT)

    # Croquis23 → Saliente-Extruir6 (add)
    with BuildSketch(Plane(origin=(0, 0, -58), x_dir=(-1, 0, 0), z_dir=(0, 0, -1))):
        with Locations((6.021111794, 7.52765343)):
            Rectangle(CROQUIS23_W, CROQUIS23_H)
    extrude(amount=-SALIENTE_EXTRUIR6_DEPTH)

    # Croquis24 → Cortar-Extruir23 (cut)
    with BuildSketch(Plane(origin=(0, 0, -58), x_dir=(-1, 0, 0), z_dir=(0, 0, -1))):
        with Locations((7.021111794, 7.52765343)):
            Circle(CROQUIS24_R)
    extrude(amount=-CORTAR_EXTRUIR23_DEPTH, mode=Mode.SUBTRACT)

    # Redondeo7
    redondeo7_edges = [part.edges().sort_by_distance(p)[0] for p in [
        (-11.800055192, 19.52765343, -58),
        (-17.658847049, 19.52765343, -48.818907414),
    ]]
    fillet(redondeo7_edges, radius=REDONDEO7_R)

    # Redondeo8
    redondeo8_edges = [part.edges().sort_by_distance(p)[0] for p in [
        (-9.021111794, 4.52765343, -53.995922289),
    ]]
    fillet(redondeo8_edges, radius=REDONDEO8_R)


solid = part.part
